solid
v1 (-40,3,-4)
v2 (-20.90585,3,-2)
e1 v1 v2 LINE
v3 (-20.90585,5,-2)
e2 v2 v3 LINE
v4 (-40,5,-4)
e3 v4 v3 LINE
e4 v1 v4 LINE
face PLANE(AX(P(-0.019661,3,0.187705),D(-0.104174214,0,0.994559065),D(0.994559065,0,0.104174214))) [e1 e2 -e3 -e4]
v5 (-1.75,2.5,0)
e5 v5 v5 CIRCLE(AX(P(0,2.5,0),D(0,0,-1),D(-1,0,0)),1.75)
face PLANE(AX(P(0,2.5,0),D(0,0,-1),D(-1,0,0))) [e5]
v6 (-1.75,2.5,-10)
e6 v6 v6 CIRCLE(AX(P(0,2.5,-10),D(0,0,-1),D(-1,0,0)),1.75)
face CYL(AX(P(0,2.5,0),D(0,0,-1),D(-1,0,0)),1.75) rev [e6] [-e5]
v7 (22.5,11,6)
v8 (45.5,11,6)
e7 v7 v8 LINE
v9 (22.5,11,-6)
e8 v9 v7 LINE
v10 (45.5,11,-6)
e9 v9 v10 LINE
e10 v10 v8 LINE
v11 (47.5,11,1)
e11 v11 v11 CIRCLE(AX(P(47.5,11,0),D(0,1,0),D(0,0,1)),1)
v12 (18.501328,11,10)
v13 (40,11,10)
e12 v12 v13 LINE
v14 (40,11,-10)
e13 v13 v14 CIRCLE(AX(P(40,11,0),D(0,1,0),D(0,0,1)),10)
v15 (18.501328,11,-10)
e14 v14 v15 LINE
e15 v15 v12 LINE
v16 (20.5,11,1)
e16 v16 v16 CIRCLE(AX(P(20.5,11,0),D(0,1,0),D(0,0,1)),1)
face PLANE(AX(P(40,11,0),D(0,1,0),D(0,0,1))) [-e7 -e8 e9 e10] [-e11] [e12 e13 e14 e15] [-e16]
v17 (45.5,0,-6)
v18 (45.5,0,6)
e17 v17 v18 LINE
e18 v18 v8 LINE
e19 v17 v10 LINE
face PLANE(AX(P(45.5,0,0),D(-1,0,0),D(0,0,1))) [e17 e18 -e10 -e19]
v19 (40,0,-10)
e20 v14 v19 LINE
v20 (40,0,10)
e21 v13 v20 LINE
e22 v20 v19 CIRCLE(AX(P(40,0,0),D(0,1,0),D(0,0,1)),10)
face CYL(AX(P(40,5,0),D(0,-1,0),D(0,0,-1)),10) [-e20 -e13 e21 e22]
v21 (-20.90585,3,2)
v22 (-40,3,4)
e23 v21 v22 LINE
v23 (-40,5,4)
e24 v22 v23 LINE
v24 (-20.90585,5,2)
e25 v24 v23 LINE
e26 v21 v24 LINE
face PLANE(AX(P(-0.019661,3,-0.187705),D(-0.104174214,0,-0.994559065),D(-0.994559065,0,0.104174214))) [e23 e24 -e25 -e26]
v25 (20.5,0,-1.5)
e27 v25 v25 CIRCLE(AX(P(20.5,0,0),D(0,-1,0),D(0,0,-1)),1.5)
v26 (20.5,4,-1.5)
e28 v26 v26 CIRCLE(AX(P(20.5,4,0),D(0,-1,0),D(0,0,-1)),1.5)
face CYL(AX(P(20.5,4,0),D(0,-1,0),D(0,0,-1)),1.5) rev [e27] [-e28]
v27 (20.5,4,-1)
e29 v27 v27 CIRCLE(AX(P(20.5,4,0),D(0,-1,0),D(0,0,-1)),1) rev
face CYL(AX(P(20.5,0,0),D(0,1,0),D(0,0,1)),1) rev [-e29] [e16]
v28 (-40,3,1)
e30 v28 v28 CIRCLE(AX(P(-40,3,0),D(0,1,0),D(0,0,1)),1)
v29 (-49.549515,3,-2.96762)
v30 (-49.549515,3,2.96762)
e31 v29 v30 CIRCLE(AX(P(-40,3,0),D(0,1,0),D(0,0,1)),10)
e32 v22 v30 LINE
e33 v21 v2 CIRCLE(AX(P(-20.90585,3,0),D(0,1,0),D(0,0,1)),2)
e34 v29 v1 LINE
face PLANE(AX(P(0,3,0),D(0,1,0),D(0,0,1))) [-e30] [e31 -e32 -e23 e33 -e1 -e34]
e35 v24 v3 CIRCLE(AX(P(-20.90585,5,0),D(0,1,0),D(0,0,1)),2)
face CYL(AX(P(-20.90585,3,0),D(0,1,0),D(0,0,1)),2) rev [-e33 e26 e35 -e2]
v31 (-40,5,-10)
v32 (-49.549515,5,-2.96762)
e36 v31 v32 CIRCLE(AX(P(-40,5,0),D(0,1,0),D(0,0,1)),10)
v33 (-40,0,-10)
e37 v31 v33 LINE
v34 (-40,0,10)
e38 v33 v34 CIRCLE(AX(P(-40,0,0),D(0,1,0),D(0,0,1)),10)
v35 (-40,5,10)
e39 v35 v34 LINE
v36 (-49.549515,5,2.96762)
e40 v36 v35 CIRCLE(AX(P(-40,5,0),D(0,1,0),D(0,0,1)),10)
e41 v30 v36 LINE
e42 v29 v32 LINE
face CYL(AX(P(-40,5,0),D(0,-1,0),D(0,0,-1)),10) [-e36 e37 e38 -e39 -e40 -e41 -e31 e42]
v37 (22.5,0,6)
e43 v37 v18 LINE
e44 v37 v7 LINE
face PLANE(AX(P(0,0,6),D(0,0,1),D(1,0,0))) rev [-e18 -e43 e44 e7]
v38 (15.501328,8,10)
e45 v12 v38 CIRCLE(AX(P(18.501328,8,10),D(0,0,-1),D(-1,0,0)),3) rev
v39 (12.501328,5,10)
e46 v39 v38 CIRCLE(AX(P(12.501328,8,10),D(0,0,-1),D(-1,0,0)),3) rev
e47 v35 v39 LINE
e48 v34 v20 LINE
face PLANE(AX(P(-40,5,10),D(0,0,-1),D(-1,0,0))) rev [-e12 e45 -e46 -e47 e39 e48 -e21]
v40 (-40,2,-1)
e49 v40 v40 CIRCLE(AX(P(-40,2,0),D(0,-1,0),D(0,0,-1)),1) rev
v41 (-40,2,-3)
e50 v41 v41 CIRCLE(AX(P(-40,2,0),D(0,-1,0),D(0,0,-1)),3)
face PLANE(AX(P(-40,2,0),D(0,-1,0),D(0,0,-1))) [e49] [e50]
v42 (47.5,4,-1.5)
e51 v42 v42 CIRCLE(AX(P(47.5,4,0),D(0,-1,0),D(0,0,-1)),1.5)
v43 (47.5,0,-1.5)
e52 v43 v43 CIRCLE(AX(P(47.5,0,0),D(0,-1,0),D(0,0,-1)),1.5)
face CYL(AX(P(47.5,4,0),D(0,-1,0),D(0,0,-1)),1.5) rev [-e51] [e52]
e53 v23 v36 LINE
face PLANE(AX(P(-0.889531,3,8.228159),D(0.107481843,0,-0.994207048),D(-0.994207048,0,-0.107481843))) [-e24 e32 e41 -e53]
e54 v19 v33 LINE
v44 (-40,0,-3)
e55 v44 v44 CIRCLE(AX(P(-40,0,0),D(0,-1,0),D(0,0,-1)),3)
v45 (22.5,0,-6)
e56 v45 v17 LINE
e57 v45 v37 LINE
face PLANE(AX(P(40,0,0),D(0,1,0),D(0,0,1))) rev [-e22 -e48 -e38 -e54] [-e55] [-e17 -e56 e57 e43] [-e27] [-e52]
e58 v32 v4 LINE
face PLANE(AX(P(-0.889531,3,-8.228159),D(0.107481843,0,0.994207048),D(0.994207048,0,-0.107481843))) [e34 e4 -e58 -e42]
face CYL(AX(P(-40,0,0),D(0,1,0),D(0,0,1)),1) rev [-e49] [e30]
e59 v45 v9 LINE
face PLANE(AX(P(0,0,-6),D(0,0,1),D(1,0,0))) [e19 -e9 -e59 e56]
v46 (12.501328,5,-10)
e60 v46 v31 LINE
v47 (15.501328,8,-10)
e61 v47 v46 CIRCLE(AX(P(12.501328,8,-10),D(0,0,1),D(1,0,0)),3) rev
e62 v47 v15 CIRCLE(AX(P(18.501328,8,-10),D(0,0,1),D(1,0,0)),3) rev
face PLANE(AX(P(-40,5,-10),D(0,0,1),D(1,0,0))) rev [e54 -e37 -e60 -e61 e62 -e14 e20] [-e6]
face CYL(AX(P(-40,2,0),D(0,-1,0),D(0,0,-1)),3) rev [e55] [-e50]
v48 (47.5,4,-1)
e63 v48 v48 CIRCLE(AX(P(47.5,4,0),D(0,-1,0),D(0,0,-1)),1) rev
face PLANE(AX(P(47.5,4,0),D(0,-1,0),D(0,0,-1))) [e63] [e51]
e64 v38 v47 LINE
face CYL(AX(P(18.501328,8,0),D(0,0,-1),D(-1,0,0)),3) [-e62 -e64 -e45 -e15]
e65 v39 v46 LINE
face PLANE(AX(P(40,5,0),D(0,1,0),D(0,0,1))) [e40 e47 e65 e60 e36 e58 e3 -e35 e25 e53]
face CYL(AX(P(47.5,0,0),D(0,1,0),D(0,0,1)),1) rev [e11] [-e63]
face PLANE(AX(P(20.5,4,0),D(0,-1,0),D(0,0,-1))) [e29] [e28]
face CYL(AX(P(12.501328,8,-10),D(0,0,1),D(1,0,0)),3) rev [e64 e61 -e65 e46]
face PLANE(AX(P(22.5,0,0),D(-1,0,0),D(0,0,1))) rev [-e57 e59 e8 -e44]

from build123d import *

# Parameters (mm, degrees)
BOSS_EXTRUDE1_DEPTH = 5
CUT_EXTRUDE1_START  = -2
CUT_EXTRUDE1_DEPTH  = 2
CUT_EXTRUDE2_DEPTH  = 52.23475383
SKETCH4_R           = 3
CUT_EXTRUDE3_DEPTH  = 2
SKETCH5_W           = 17.5
SKETCH5_H           = 12
SKETCH5_W_2         = 5.5
SKETCH5_R           = 1
CUT_EXTRUDE4_DEPTH  = 52.23475383
BOSS_EXTRUDE2_START = 6
SKETCH6_R           = 1
SKETCH6_W           = 23
SKETCH6_H           = 12
BOSS_EXTRUDE2_DEPTH = 6
FILLET1_R           = 3
FILLET2_R           = 3
SKETCH7_R           = 1.5
CUT_EXTRUDE5_DEPTH  = 4
SKETCH8_R           = 1.75
CUT_EXTRUDE6_DEPTH  = 10


with BuildPart() as part:
    # Sketch1 → Boss-Extrude1 (new body)
    with BuildSketch(Plane(origin=(0, 0, 0), x_dir=(1, 0, 0), z_dir=(0, 1, 0))):
        with BuildLine():
            Line((-40, 10), (40, 10))
            ThreePointArc((40, 10), (50, 0), (40, -10))
            Line((40, -10), (-40, -10))
            ThreePointArc((-40, -10), (-50, 0), (-40, 10))
        make_face()
    extrude(amount=BOSS_EXTRUDE1_DEPTH)

    # Sketch2 → Cut-Extrude1 (cut)
    with BuildSketch(Plane(origin=(0, 5, 0), x_dir=(1, 0, 0), z_dir=(0, 1, 0)).offset(CUT_EXTRUDE1_START)):
        with BuildLine():
            Line((-39.171140726, 3.913181864), (-40, 4))
            Line((-40, 4), (-40.854873646, 3.907581227))
            Line((-40.854873646, 3.907581227), (-49.549514718, 2.96762003))
            ThreePointArc((-49.549514718, 2.96762003), (-50, 0), (-49.549514718, -2.96762003))
            Line((-49.549514718, -2.96762003), (-40.854873646, -3.907581227))
            Line((-40.854873646, -3.907581227), (-40, -4))
            Line((-40, -4), (-39.171140726, -3.913181864))
            Line((-39.171140726, -3.913181864), (-20.905849501, -2))
            ThreePointArc((-20.905849501, -2), (-18.905849501, 0), (-20.905849501, 2))
            Line((-20.905849501, 2), (-39.171140726, 3.913181864))
        make_face()
    extrude(amount=CUT_EXTRUDE1_DEPTH, mode=Mode.SUBTRACT)

    # Sketch3 → Cut-Extrude2 (cut, through all)
    with BuildSketch(Plane(origin=(0, 5, 0), x_dir=(1, 0, 0), z_dir=(0, 1, 0))):
        with BuildLine():
            ThreePointArc((-39, 0), (-39.292893219, 0.707106781), (-40, 1))
            Line((-40, 1), (-40, -1))
            ThreePointArc((-40, -1), (-39.292893219, -0.707106781), (-39, 0))
        make_face()
        with BuildLine():
            Line((-40, -1), (-40, 1))
            ThreePointArc((-40, 1), (-41, 0), (-40, -1))
        make_face()
    extrude(amount=-CUT_EXTRUDE2_DEPTH, mode=Mode.SUBTRACT)

    # Sketch4 → Cut-Extrude3 (cut)
    with BuildSketch(Plane.XZ):
        with Locations(Location((-40, 0, 0), (0, 0, 270))):
            Circle(SKETCH4_R)
    extrude(amount=-CUT_EXTRUDE3_DEPTH, mode=Mode.SUBTRACT)

    # Sketch5 → Cut-Extrude4 (cut, through all)
    with BuildSketch(Plane(origin=(0, 5, 0), x_dir=(1, 0, 0), z_dir=(0, 1, 0))):
        with Locations((31.25, 0)):
            Rectangle(SKETCH5_W, SKETCH5_H)
        with Locations((42.75, 0)):
            Rectangle(SKETCH5_W_2, SKETCH5_H)
        with Locations(Location((47.5, 0, 0), (0, 0, 270))):
            Circle(SKETCH5_R)
        with Locations(Location((20.5, 0, 0), (0, 0, 270))):
            Circle(SKETCH5_R)
    extrude(amount=-CUT_EXTRUDE4_DEPTH, mode=Mode.SUBTRACT)

    # Sketch6 → Boss-Extrude2 (add)
    with BuildSketch(Plane(origin=(0, 5, 0), x_dir=(1, 0, 0), z_dir=(0, 1, 0)).offset(BOSS_EXTRUDE2_START)):
        with BuildLine():
            Line((15.501327646, 10), (15.501327646, -10))
            Line((15.501327646, -10), (40, -10))
            ThreePointArc((40, -10), (50, 0), (40, 10))
            Line((40, 10), (15.501327646, 10))
        make_face()
        with Locations(Location((20.5, 0, 0), (0, 0, 270))):
            Circle(SKETCH6_R, mode=Mode.SUBTRACT)
        with Locations(Location((47.5, 0, 0), (0, 0, 270))):
            Circle(SKETCH6_R, mode=Mode.SUBTRACT)
        with Locations((34, 0)):
            Rectangle(SKETCH6_W, SKETCH6_H, mode=Mode.SUBTRACT)
    extrude(amount=-BOSS_EXTRUDE2_DEPTH)

    # Fillet1
    fillet1_edges = [part.edges().sort_by_distance(p)[0] for p in [
        (15.501327646, 11, 0),
    ]]
    fillet(fillet1_edges, radius=FILLET1_R)

    # Fillet2
    fillet2_edges = [part.edges().sort_by_distance(p)[0] for p in [
        (15.501327646, 5, 0),
    ]]
    fillet(fillet2_edges, radius=FILLET2_R - 0.0001)  # a hair under: the kernel refuses the full size

    # Sketch7 → Cut-Extrude5 (cut)
    with BuildSketch(Plane.XZ):
        with Locations(Location((20.5, 0, 0), (0, 0, 270))):
            Circle(SKETCH7_R)
        with Locations(Location((47.5, 0, 0), (0, 0, 270))):
            Circle(SKETCH7_R)
    extrude(amount=-CUT_EXTRUDE5_DEPTH, mode=Mode.SUBTRACT)

    # Sketch8 → Cut-Extrude6 (cut)
    with BuildSketch(Plane(origin=(0, 0, -10), x_dir=(-1, 0, 0), z_dir=(0, 0, -1))):
        with Locations((0, 2.5)):
            Circle(SKETCH8_R)
    extrude(amount=-CUT_EXTRUDE6_DEPTH, mode=Mode.SUBTRACT)


solid = part.part
